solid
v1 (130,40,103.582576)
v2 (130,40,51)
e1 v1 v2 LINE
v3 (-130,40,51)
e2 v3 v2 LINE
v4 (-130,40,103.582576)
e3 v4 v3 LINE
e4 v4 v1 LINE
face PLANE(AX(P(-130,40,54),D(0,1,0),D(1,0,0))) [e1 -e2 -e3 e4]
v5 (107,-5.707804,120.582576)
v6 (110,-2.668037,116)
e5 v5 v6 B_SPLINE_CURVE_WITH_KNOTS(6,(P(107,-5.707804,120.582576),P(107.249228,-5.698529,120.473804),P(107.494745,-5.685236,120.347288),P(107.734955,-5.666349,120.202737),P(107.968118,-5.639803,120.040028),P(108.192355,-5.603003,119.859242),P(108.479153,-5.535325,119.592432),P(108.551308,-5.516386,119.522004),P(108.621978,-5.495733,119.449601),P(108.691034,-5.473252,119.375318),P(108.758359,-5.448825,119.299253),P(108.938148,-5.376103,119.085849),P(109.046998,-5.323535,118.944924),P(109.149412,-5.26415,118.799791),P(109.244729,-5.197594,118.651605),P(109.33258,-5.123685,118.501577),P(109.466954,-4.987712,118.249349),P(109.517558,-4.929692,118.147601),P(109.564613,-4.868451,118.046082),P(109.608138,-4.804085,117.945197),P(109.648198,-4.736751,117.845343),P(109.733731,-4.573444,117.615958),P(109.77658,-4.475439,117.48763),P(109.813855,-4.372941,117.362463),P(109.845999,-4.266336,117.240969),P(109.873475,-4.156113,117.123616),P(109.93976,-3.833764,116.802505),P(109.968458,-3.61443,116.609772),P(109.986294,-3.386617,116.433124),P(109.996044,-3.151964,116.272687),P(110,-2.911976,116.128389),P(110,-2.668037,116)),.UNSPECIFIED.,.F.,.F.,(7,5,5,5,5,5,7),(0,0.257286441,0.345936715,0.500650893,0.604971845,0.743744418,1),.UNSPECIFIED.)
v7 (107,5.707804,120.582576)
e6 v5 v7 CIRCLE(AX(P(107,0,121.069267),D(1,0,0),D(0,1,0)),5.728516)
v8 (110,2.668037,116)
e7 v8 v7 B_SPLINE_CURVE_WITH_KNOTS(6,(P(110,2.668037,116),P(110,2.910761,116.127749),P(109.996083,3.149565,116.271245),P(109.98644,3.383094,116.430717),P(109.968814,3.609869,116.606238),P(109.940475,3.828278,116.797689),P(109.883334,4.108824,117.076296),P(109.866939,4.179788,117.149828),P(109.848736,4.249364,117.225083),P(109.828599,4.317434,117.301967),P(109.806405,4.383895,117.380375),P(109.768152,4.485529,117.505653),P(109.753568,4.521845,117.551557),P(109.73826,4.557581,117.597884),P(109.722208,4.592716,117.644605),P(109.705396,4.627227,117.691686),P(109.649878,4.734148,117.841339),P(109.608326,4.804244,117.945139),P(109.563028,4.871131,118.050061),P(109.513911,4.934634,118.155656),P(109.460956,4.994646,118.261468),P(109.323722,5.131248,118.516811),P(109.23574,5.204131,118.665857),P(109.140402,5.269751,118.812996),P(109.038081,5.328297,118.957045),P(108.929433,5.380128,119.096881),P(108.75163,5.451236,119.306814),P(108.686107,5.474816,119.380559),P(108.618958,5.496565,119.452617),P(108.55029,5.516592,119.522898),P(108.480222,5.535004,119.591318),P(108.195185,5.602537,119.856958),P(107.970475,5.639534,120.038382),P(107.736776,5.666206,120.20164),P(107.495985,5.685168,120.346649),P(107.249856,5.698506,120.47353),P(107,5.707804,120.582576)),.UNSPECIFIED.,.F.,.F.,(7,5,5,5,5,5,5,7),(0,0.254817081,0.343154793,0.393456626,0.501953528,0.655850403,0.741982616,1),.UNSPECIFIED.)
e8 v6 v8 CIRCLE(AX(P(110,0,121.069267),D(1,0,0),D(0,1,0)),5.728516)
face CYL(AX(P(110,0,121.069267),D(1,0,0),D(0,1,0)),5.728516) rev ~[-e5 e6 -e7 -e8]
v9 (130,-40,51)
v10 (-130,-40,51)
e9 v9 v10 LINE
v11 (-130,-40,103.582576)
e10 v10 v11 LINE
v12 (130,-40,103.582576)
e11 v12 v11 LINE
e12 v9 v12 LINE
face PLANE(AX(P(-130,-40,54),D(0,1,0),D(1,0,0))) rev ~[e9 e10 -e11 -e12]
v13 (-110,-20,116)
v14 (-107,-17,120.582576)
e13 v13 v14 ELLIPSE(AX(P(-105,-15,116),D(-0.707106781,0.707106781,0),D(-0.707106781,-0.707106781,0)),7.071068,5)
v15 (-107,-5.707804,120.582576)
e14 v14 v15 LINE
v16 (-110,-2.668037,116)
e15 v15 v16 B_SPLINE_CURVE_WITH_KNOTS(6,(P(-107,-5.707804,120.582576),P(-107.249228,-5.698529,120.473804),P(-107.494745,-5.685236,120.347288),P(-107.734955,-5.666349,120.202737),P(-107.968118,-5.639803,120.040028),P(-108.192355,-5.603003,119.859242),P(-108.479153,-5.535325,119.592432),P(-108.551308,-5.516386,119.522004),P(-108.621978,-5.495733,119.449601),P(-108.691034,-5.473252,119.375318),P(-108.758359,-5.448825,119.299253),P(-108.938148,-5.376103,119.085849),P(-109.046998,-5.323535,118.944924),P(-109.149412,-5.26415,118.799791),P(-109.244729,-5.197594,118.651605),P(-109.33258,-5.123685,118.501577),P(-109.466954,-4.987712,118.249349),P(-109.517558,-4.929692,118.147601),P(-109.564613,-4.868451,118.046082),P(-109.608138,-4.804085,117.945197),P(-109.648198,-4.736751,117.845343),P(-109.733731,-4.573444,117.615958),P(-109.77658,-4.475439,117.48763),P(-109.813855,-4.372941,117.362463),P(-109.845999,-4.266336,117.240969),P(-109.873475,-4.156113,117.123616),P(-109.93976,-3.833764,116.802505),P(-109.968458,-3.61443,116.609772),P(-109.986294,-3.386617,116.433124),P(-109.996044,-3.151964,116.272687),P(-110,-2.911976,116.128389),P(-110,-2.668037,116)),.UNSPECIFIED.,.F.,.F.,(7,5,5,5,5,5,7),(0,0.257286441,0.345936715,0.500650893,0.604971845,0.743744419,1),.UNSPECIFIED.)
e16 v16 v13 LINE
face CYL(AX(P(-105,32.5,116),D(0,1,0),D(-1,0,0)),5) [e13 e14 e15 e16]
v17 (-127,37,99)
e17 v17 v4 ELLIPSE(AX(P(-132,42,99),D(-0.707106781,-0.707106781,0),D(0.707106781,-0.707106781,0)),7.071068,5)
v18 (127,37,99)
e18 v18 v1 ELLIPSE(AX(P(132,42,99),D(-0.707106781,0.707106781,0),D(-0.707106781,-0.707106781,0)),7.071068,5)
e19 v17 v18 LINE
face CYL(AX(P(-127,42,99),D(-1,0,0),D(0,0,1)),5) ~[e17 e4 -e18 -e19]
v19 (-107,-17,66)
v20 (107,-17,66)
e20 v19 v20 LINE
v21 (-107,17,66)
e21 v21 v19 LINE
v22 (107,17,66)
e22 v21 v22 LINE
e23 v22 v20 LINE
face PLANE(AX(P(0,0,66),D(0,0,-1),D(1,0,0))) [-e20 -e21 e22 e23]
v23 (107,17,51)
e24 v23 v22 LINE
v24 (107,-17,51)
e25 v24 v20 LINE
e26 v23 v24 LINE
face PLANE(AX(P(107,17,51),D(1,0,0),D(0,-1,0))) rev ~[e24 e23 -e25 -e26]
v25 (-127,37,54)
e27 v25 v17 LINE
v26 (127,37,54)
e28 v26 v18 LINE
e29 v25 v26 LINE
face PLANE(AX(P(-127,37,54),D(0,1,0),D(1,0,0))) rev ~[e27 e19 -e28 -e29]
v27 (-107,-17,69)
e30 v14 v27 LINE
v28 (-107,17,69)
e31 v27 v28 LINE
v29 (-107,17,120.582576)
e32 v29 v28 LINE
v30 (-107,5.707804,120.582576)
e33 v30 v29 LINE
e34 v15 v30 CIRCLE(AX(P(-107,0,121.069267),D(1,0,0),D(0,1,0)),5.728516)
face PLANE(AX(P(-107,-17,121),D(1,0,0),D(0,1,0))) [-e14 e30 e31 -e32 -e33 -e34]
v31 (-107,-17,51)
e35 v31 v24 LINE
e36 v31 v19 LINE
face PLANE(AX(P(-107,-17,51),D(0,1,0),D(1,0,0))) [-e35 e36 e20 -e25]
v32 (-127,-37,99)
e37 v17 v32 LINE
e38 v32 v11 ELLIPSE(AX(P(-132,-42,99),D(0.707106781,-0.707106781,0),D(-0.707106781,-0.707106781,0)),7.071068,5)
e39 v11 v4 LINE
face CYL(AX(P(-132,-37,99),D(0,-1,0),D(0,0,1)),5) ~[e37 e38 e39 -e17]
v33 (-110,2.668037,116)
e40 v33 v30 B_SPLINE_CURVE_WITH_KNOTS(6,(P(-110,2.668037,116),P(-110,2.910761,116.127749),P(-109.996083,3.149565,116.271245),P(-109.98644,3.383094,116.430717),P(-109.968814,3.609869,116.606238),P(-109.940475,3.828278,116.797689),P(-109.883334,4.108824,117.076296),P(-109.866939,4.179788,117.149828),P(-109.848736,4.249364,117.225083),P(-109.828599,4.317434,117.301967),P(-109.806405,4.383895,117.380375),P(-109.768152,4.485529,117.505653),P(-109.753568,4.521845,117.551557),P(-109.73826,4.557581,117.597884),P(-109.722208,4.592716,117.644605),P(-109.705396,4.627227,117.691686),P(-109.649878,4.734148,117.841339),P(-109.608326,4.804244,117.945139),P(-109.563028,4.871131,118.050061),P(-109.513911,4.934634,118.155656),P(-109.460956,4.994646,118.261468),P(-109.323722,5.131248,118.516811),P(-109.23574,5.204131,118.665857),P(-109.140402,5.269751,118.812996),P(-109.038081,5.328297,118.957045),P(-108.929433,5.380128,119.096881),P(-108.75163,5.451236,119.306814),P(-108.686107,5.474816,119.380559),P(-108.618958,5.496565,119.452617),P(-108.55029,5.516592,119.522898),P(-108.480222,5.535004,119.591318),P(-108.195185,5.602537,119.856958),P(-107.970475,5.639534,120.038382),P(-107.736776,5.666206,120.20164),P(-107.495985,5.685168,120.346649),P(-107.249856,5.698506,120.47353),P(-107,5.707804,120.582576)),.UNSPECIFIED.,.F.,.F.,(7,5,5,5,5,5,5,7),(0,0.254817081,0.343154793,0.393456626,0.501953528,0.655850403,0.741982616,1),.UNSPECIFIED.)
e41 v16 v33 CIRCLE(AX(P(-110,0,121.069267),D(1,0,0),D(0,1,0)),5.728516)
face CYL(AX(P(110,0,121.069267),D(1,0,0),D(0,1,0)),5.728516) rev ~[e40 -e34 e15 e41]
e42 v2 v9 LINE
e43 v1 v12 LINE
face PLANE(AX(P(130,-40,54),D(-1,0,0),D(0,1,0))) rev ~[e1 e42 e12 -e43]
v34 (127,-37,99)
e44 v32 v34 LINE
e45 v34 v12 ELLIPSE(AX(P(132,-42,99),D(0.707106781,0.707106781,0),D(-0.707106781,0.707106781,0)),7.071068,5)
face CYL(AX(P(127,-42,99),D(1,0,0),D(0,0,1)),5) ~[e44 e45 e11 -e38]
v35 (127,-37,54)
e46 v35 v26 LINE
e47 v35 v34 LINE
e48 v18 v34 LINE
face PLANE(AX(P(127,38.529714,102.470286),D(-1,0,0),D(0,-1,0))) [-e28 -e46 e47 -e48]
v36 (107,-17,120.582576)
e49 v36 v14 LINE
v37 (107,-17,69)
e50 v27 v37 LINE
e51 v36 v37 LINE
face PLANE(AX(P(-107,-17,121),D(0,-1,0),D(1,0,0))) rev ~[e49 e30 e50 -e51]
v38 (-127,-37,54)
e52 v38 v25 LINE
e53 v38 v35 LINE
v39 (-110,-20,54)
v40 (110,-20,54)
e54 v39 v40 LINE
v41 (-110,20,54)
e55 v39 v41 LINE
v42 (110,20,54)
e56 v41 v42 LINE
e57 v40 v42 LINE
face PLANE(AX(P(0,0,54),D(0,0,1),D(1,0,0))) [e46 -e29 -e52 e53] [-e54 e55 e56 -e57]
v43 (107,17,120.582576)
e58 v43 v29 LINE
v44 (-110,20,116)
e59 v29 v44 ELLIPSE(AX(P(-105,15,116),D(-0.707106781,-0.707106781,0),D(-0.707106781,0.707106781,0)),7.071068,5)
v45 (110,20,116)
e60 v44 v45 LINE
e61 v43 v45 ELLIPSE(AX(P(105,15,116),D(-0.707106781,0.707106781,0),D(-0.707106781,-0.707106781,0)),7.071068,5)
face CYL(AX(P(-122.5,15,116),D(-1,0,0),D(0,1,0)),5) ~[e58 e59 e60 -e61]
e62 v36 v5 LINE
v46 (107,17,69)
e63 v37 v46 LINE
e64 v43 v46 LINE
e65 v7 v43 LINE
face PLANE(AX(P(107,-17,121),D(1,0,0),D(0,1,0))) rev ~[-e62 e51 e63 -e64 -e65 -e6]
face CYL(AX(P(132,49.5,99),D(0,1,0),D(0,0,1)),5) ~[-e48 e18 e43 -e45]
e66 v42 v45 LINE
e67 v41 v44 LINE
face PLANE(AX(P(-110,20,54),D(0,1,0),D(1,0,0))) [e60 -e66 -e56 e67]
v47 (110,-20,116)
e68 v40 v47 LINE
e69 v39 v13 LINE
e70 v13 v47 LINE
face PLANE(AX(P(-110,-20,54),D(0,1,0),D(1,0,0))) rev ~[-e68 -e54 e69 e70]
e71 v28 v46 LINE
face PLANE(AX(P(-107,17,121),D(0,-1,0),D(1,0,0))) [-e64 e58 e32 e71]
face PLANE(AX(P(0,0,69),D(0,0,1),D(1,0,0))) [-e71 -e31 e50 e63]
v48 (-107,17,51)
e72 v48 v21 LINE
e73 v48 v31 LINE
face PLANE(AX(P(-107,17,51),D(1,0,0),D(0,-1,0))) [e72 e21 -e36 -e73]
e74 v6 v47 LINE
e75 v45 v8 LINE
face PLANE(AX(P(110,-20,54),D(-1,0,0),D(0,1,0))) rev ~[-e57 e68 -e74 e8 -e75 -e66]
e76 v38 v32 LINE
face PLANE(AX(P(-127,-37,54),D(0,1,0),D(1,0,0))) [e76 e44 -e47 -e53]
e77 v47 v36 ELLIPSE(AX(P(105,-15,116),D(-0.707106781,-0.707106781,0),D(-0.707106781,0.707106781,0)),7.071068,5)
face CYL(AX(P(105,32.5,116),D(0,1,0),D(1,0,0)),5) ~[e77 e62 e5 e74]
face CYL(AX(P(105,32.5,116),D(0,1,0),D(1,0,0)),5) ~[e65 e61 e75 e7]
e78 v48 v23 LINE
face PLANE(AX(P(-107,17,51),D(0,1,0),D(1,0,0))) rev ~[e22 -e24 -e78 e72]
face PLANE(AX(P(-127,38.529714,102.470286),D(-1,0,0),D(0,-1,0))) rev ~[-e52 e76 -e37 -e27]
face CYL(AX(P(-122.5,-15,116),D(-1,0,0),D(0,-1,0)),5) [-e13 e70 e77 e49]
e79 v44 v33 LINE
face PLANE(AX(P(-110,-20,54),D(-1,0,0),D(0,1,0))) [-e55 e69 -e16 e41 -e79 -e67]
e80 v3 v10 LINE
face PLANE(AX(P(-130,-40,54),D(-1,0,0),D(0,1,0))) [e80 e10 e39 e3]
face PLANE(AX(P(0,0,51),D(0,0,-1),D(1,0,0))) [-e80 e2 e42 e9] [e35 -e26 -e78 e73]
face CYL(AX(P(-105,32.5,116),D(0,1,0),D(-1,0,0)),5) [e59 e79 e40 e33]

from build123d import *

# Parameters (mm, degrees)
F0_W          = 260
F0_H          = 80
F1_DEPTH      = 1
F2_W          = 10
F2_H          = 10
F3_DEPTH      = 50
F4_T          = 1
F4_T3_DEPTH   = 12
F4_T5_DEPTH   = 12
F4_T7_DEPTH   = 12
F4_T9_DEPTH   = 12
F5_W          = 260
F5_H          = 80
F6_DEPTH      = 3
F7_W          = 260
F7_H          = 80
F7_W_2        = 254
F7_H_2        = 74
F8_DEPTH      = 50
F9_W          = 220
F9_H          = 40
F10_DEPTH     = 67
F11_W         = 214
F11_H         = 34
F12_DEPTH     = 52
F13_W         = 214
F13_H         = 34
F14_DEPTH     = 15
F15_T1_DEPTH  = 245
F15_T3_DEPTH  = 65
F15_T5_DEPTH  = 254
F15_T7_DEPTH  = 74
F15_T13_DEPTH = 86.5
F15_T19_DEPTH = 266.5
F15_T28_DEPTH = 86.5
F15_T34_DEPTH = 266.5
F15_T43_DEPTH = 266.5
F15_T49_DEPTH = 86.5
F15_T58_DEPTH = 86.5
F15_T64_DEPTH = 266.5
F16_R         = 5.7285158572
F17_DEPTH     = 500
F18_W         = 260
F18_H         = 80
F19_DEPTH     = 51


# Not quite as in the source:
# - a fillet or chamfer that OpenCascade refuses, or shapes differently, is made with other operations: its cross-section is extruded or revolved along the edge and cut away or added
# - a shell that OpenCascade refuses in one call is made with other operations: the cavity is built on its own and cut out


with BuildPart() as f1:
    # F0 (on Top) → F1 (new body)
    with BuildSketch(Plane.XY):
        Rectangle(F0_W, F0_H)
    extrude(amount=F1_DEPTH)

    # F2 (on face) → F3 (join)
    with BuildSketch(Plane.XY.offset(1)):
        with Locations((-125, 35)):
            Rectangle(F2_W, F2_H)
        with Locations((125, 35)):
            Rectangle(F2_W, F2_H)
        with Locations((-125, -35)):
            Rectangle(F2_W, F2_H)
        with Locations((125, -35)):
            Rectangle(F2_W, F2_H)
    extrude(amount=F3_DEPTH)

    # F4: shell of thickness 1, made by hand


with BuildPart() as f4_core1:
    # F4_t2: copy of F1
    add(f1.part)

    # the walls: a layer under each face that stays
    f4_faces = [f4_core1.faces().sort_by_distance(p)[0] for p in [
        (121.3333333333, 40, 49.3),
        (-121.3333333333, -40, 49.3),
        (125, -35, 51),
        (125, -30, 26),
        (120, -35, 26),
        (-120, -35, 26),
        (-125, -30, 26),
        (-125, -35, 51),
        (-130, 34.2857142857, 47.3571428571),
        (-125, 30, 26),
        (-125, 35, 51),
        (-120, 35, 26),
        (0, 0, 1),
        (125, 30, 26),
        (120, 35, 26),
        (125, 35, 51),
        (130, -34.2857142857, 47.3571428571),
    ]]
    thicken(f4_faces, amount=-F4_T, mode=Mode.SUBTRACT)

    # F4_s4 → F4_t3 (cut)
    with BuildSketch(Plane.YZ.offset(119)):
        Polygon((-29.99, 1.01), (-31, 1), (-31, 0), (-30, 0), align=None)
        Polygon((29.99, 1.01), (30, 0), (31, 0), (31, 1), align=None)
    extrude(amount=F4_T3_DEPTH, mode=Mode.SUBTRACT)

    # F4_s6 → F4_t5 (cut)
    with BuildSketch(Plane.XZ.offset(29)):
        Polygon((119.99, 1.01), (121, 1), (121, 0), (120, 0), align=None)
        Polygon((-119.99, 1.01), (-121, 1), (-121, 0), (-120, 0), align=None)
    extrude(amount=F4_T5_DEPTH, mode=Mode.SUBTRACT)

    # F4_s8 → F4_t7 (cut)
    with BuildSketch(Plane.YZ.offset(-131)):
        Polygon((-29.99, 1.01), (-31, 1), (-31, 0), (-30, 0), align=None)
        Polygon((29.99, 1.01), (31, 1), (31, 0), (30, 0), align=None)
    extrude(amount=F4_T7_DEPTH, mode=Mode.SUBTRACT)

    # F4_s10 → F4_t9 (cut)
    with BuildSketch(Plane.XZ.offset(-41)):
        Polygon((-119.99, 1.01), (-121, 1), (-121, 0), (-120, 0), align=None)
        Polygon((119.99, 1.01), (120, 0), (121, 0), (121, 1), align=None)
    extrude(amount=F4_T9_DEPTH, mode=Mode.SUBTRACT)


with BuildPart() as f1_1:
    add(f1.part)

    # what is left inside the walls is the cavity
    f4_cavity = [f4_core1.part.solids().sort_by_distance(p)[0] for p in [
        (125, 38.99, 33.333333),
        (-125, 38.99, 33.333333),
        (128.99, -35, 33.333333),
        (-123.666667, -31.01, 25),
    ]]
    add(f4_cavity, mode=Mode.SUBTRACT)

    # F5 (on face) → F6 (join)
    with BuildSketch(Plane.XY.offset(51)):
        Rectangle(F5_W, F5_H)
    extrude(amount=F6_DEPTH)

    # F7 (on face) → F8 (join)
    with BuildSketch(Plane.XY.offset(54)):
        Rectangle(F7_W, F7_H)
        Rectangle(F7_W_2, F7_H_2, mode=Mode.SUBTRACT)
    extrude(amount=F8_DEPTH)

    # F9 (on face) → F10 (join)
    with BuildSketch(Plane.XY.offset(54)):
        Rectangle(F9_W, F9_H)
    extrude(amount=F10_DEPTH)

    # F11 (on face) → F12 (cut)
    with BuildSketch(Plane.XY.offset(121)):
        Rectangle(F11_W, F11_H)
    extrude(amount=-F12_DEPTH, mode=Mode.SUBTRACT)

    # F13 (on face) → F14 (cut)
    with BuildSketch(Plane(origin=(0, 0, 51), x_dir=(1, 0, 0), z_dir=(0, 0, -1))):
        Rectangle(F13_W, F13_H)
    extrude(amount=-F14_DEPTH, mode=Mode.SUBTRACT)

    # F15: fillet of radius 5 on 8 edges, made by hand

    # F15_s2 → F15_t1 (cut)
    with BuildSketch(Plane.YZ.offset(-122.5)):
        with BuildLine():
            ThreePointArc((-20, 116), (-18.5355339059, 119.5355339059), (-15, 121))
            Line((-15, 121), (-20, 121))
            Line((-20, 121), (-20, 116))
        make_face()
        with BuildLine():
            ThreePointArc((20, 116), (18.5355339059, 119.5355339059), (15, 121))
            Line((15, 121), (20, 121))
            Line((20, 121), (20, 116))
        make_face()
    extrude(amount=F15_T1_DEPTH, mode=Mode.SUBTRACT)

    # F15_s4 → F15_t3 (cut)
    with BuildSketch(Plane.XZ.offset(-32.5)):
        with BuildLine():
            ThreePointArc((-110, 116), (-108.5355339059, 119.5355339059), (-105, 121))
            Line((-105, 121), (-110, 121))
            Line((-110, 121), (-110, 116))
        make_face()
        with BuildLine():
            ThreePointArc((110, 116), (108.5355339059, 119.5355339059), (105, 121))
            Line((105, 121), (110, 121))
            Line((110, 121), (110, 116))
        make_face()
    extrude(amount=F15_T3_DEPTH, mode=Mode.SUBTRACT)

    # F15_s6 → F15_t5 (cut)
    with BuildSketch(Plane.YZ.offset(-127)):
        with BuildLine():
            ThreePointArc((-42, 104), (-38.4644660941, 102.5355339059), (-37, 99))
            Line((-37, 99), (-37, 104))
            Line((-37, 104), (-42, 104))
        make_face()
        with BuildLine():
            ThreePointArc((42, 104), (38.4644660941, 102.5355339059), (37, 99))
            Line((37, 99), (37, 104))
            Line((37, 104), (42, 104))
        make_face()
    extrude(amount=F15_T5_DEPTH, mode=Mode.SUBTRACT)

    # F15_s8 → F15_t7 (cut)
    with BuildSketch(Plane.XZ.offset(-37)):
        with BuildLine():
            ThreePointArc((132, 104), (128.4644660941, 102.5355339059), (127, 99))
            Line((127, 99), (127, 104))
            Line((127, 104), (132, 104))
        make_face()
        with BuildLine():
            ThreePointArc((-132, 104), (-128.4644660941, 102.5355339059), (-127, 99))
            Line((-127, 99), (-127, 104))
            Line((-127, 104), (-132, 104))
        make_face()
    extrude(amount=F15_T7_DEPTH, mode=Mode.SUBTRACT)


with BuildPart() as f15_tool11:
    # F15_s12 → F15_t13 (new body)
    with BuildSketch(Plane.XZ.offset(-37)):
        with BuildLine():
            ThreePointArc((132, 104), (128.4644660941, 102.5355339059), (127, 99))
            Line((127, 99), (127, 104))
            Line((127, 104), (132, 104))
        make_face()
    extrude(amount=F15_T13_DEPTH)

    split(bisect_by=Plane.YZ.offset(130), keep=Keep.BOTTOM)

    split(bisect_by=Plane.XZ.offset(40), keep=Keep.BOTTOM)

    split(bisect_by=Plane.XZ.offset(37), keep=Keep.TOP)


with BuildPart() as f15_tool17:
    # F15_s18 → F15_t19 (new body)
    with BuildSketch(Plane.YZ.offset(139.5)):
        with BuildLine():
            ThreePointArc((-42, 104), (-38.4644660941, 102.5355339059), (-37, 99))
            Line((-37, 99), (-37, 104))
            Line((-37, 104), (-42, 104))
        make_face()
    extrude(amount=-F15_T19_DEPTH)

    split(bisect_by=Plane.YZ.offset(130), keep=Keep.BOTTOM)

    split(bisect_by=Plane.XZ.offset(40), keep=Keep.BOTTOM)

    split(bisect_by=Plane.YZ.offset(127), keep=Keep.TOP)


with BuildPart() as f15_tool11_1:
    add(f15_tool11.part)

    # F15_t23: intersect F15_tool17
    add(f15_tool17.part, mode=Mode.INTERSECT)


with BuildPart() as f1_2:
    add(f1_1.part)

    # F15_t9: cut F15_tool11
    add(f15_tool11_1.part, mode=Mode.SUBTRACT)


with BuildPart() as f15_tool26:
    # F15_s27 → F15_t28 (new body)
    with BuildSketch(Plane.XZ.offset(49.5)):
        with BuildLine():
            ThreePointArc((-132, 104), (-128.4644660941, 102.5355339059), (-127, 99))
            Line((-127, 99), (-127, 104))
            Line((-127, 104), (-132, 104))
        make_face()
    extrude(amount=-F15_T28_DEPTH)

    split(bisect_by=Plane.YZ.offset(-130), keep=Keep.TOP)

    split(bisect_by=Plane.XZ.offset(40), keep=Keep.BOTTOM)

    split(bisect_by=Plane.XZ.offset(37), keep=Keep.TOP)


with BuildPart() as f15_tool32:
    # F15_s33 → F15_t34 (new body)
    with BuildSketch(Plane.YZ.offset(127)):
        with BuildLine():
            ThreePointArc((-42, 104), (-38.4644660941, 102.5355339059), (-37, 99))
            Line((-37, 99), (-37, 104))
            Line((-37, 104), (-42, 104))
        make_face()
    extrude(amount=-F15_T34_DEPTH)

    split(bisect_by=Plane.YZ.offset(-130), keep=Keep.TOP)

    split(bisect_by=Plane.XZ.offset(40), keep=Keep.BOTTOM)

    split(bisect_by=Plane.YZ.offset(-127), keep=Keep.BOTTOM)


with BuildPart() as f15_tool26_1:
    add(f15_tool26.part)

    # F15_t38: intersect F15_tool32
    add(f15_tool32.part, mode=Mode.INTERSECT)


with BuildPart() as f1_3:
    add(f1_2.part)

    # F15_t24: cut F15_tool26
    add(f15_tool26_1.part, mode=Mode.SUBTRACT)


with BuildPart() as f15_tool41:
    # F15_s42 → F15_t43 (new body)
    with BuildSketch(Plane.YZ.offset(-127)):
        with BuildLine():
            ThreePointArc((42, 104), (38.4644660941, 102.5355339059), (37, 99))
            Line((37, 99), (37, 104))
            Line((37, 104), (42, 104))
        make_face()
    extrude(amount=F15_T43_DEPTH)

    split(bisect_by=Plane.XZ.offset(-40), keep=Keep.TOP)

    split(bisect_by=Plane.YZ.offset(130), keep=Keep.BOTTOM)

    split(bisect_by=Plane.YZ.offset(127), keep=Keep.TOP)


with BuildPart() as f15_tool47:
    # F15_s48 → F15_t49 (new body)
    with BuildSketch(Plane.XZ.offset(-49.5)):
        with BuildLine():
            ThreePointArc((132, 104), (128.4644660941, 102.5355339059), (127, 99))
            Line((127, 99), (127, 104))
            Line((127, 104), (132, 104))
        make_face()
    extrude(amount=F15_T49_DEPTH)

    split(bisect_by=Plane.XZ.offset(-40), keep=Keep.TOP)

    split(bisect_by=Plane.YZ.offset(130), keep=Keep.BOTTOM)

    split(bisect_by=Plane.XZ.offset(-37), keep=Keep.BOTTOM)


with BuildPart() as f15_tool41_1:
    add(f15_tool41.part)

    # F15_t53: intersect F15_tool47
    add(f15_tool47.part, mode=Mode.INTERSECT)


with BuildPart() as f1_4:
    add(f1_3.part)

    # F15_t39: cut F15_tool41
    add(f15_tool41_1.part, mode=Mode.SUBTRACT)


with BuildPart() as f15_tool56:
    # F15_s57 → F15_t58 (new body)
    with BuildSketch(Plane.XZ.offset(37)):
        with BuildLine():
            ThreePointArc((-132, 104), (-128.4644660941, 102.5355339059), (-127, 99))
            Line((-127, 99), (-127, 104))
            Line((-127, 104), (-132, 104))
        make_face()
    extrude(amount=-F15_T58_DEPTH)

    split(bisect_by=Plane.XZ.offset(-40), keep=Keep.TOP)

    split(bisect_by=Plane.YZ.offset(-130), keep=Keep.TOP)

    split(bisect_by=Plane.XZ.offset(-37), keep=Keep.BOTTOM)


with BuildPart() as f15_tool62:
    # F15_s63 → F15_t64 (new body)
    with BuildSketch(Plane.YZ.offset(-139.5)):
        with BuildLine():
            ThreePointArc((42, 104), (38.4644660941, 102.5355339059), (37, 99))
            Line((37, 99), (37, 104))
            Line((37, 104), (42, 104))
        make_face()
    extrude(amount=F15_T64_DEPTH)

    split(bisect_by=Plane.XZ.offset(-40), keep=Keep.TOP)

    split(bisect_by=Plane.YZ.offset(-130), keep=Keep.TOP)

    split(bisect_by=Plane.YZ.offset(-127), keep=Keep.BOTTOM)


with BuildPart() as f15_tool56_1:
    add(f15_tool56.part)

    # F15_t68: intersect F15_tool62
    add(f15_tool62.part, mode=Mode.INTERSECT)


with BuildPart() as f1_5:
    add(f1_4.part)

    # F15_t54: cut F15_tool56
    add(f15_tool56_1.part, mode=Mode.SUBTRACT)

    # F16 (on face) → F17 (cut)
    with BuildSketch(Plane.YZ.offset(110)):
        with Locations((0, 121.0692673922)):
            Circle(F16_R)
    extrude(amount=-F17_DEPTH, mode=Mode.SUBTRACT)

    # F18 (on face) → F19 (cut)
    with BuildSketch(Plane(origin=(0, 0, 0), x_dir=(1, 0, 0), z_dir=(0, 0, -1))):
        Rectangle(F18_W, F18_H)
    extrude(amount=-F19_DEPTH, mode=Mode.SUBTRACT)


solid = f1_5.part
